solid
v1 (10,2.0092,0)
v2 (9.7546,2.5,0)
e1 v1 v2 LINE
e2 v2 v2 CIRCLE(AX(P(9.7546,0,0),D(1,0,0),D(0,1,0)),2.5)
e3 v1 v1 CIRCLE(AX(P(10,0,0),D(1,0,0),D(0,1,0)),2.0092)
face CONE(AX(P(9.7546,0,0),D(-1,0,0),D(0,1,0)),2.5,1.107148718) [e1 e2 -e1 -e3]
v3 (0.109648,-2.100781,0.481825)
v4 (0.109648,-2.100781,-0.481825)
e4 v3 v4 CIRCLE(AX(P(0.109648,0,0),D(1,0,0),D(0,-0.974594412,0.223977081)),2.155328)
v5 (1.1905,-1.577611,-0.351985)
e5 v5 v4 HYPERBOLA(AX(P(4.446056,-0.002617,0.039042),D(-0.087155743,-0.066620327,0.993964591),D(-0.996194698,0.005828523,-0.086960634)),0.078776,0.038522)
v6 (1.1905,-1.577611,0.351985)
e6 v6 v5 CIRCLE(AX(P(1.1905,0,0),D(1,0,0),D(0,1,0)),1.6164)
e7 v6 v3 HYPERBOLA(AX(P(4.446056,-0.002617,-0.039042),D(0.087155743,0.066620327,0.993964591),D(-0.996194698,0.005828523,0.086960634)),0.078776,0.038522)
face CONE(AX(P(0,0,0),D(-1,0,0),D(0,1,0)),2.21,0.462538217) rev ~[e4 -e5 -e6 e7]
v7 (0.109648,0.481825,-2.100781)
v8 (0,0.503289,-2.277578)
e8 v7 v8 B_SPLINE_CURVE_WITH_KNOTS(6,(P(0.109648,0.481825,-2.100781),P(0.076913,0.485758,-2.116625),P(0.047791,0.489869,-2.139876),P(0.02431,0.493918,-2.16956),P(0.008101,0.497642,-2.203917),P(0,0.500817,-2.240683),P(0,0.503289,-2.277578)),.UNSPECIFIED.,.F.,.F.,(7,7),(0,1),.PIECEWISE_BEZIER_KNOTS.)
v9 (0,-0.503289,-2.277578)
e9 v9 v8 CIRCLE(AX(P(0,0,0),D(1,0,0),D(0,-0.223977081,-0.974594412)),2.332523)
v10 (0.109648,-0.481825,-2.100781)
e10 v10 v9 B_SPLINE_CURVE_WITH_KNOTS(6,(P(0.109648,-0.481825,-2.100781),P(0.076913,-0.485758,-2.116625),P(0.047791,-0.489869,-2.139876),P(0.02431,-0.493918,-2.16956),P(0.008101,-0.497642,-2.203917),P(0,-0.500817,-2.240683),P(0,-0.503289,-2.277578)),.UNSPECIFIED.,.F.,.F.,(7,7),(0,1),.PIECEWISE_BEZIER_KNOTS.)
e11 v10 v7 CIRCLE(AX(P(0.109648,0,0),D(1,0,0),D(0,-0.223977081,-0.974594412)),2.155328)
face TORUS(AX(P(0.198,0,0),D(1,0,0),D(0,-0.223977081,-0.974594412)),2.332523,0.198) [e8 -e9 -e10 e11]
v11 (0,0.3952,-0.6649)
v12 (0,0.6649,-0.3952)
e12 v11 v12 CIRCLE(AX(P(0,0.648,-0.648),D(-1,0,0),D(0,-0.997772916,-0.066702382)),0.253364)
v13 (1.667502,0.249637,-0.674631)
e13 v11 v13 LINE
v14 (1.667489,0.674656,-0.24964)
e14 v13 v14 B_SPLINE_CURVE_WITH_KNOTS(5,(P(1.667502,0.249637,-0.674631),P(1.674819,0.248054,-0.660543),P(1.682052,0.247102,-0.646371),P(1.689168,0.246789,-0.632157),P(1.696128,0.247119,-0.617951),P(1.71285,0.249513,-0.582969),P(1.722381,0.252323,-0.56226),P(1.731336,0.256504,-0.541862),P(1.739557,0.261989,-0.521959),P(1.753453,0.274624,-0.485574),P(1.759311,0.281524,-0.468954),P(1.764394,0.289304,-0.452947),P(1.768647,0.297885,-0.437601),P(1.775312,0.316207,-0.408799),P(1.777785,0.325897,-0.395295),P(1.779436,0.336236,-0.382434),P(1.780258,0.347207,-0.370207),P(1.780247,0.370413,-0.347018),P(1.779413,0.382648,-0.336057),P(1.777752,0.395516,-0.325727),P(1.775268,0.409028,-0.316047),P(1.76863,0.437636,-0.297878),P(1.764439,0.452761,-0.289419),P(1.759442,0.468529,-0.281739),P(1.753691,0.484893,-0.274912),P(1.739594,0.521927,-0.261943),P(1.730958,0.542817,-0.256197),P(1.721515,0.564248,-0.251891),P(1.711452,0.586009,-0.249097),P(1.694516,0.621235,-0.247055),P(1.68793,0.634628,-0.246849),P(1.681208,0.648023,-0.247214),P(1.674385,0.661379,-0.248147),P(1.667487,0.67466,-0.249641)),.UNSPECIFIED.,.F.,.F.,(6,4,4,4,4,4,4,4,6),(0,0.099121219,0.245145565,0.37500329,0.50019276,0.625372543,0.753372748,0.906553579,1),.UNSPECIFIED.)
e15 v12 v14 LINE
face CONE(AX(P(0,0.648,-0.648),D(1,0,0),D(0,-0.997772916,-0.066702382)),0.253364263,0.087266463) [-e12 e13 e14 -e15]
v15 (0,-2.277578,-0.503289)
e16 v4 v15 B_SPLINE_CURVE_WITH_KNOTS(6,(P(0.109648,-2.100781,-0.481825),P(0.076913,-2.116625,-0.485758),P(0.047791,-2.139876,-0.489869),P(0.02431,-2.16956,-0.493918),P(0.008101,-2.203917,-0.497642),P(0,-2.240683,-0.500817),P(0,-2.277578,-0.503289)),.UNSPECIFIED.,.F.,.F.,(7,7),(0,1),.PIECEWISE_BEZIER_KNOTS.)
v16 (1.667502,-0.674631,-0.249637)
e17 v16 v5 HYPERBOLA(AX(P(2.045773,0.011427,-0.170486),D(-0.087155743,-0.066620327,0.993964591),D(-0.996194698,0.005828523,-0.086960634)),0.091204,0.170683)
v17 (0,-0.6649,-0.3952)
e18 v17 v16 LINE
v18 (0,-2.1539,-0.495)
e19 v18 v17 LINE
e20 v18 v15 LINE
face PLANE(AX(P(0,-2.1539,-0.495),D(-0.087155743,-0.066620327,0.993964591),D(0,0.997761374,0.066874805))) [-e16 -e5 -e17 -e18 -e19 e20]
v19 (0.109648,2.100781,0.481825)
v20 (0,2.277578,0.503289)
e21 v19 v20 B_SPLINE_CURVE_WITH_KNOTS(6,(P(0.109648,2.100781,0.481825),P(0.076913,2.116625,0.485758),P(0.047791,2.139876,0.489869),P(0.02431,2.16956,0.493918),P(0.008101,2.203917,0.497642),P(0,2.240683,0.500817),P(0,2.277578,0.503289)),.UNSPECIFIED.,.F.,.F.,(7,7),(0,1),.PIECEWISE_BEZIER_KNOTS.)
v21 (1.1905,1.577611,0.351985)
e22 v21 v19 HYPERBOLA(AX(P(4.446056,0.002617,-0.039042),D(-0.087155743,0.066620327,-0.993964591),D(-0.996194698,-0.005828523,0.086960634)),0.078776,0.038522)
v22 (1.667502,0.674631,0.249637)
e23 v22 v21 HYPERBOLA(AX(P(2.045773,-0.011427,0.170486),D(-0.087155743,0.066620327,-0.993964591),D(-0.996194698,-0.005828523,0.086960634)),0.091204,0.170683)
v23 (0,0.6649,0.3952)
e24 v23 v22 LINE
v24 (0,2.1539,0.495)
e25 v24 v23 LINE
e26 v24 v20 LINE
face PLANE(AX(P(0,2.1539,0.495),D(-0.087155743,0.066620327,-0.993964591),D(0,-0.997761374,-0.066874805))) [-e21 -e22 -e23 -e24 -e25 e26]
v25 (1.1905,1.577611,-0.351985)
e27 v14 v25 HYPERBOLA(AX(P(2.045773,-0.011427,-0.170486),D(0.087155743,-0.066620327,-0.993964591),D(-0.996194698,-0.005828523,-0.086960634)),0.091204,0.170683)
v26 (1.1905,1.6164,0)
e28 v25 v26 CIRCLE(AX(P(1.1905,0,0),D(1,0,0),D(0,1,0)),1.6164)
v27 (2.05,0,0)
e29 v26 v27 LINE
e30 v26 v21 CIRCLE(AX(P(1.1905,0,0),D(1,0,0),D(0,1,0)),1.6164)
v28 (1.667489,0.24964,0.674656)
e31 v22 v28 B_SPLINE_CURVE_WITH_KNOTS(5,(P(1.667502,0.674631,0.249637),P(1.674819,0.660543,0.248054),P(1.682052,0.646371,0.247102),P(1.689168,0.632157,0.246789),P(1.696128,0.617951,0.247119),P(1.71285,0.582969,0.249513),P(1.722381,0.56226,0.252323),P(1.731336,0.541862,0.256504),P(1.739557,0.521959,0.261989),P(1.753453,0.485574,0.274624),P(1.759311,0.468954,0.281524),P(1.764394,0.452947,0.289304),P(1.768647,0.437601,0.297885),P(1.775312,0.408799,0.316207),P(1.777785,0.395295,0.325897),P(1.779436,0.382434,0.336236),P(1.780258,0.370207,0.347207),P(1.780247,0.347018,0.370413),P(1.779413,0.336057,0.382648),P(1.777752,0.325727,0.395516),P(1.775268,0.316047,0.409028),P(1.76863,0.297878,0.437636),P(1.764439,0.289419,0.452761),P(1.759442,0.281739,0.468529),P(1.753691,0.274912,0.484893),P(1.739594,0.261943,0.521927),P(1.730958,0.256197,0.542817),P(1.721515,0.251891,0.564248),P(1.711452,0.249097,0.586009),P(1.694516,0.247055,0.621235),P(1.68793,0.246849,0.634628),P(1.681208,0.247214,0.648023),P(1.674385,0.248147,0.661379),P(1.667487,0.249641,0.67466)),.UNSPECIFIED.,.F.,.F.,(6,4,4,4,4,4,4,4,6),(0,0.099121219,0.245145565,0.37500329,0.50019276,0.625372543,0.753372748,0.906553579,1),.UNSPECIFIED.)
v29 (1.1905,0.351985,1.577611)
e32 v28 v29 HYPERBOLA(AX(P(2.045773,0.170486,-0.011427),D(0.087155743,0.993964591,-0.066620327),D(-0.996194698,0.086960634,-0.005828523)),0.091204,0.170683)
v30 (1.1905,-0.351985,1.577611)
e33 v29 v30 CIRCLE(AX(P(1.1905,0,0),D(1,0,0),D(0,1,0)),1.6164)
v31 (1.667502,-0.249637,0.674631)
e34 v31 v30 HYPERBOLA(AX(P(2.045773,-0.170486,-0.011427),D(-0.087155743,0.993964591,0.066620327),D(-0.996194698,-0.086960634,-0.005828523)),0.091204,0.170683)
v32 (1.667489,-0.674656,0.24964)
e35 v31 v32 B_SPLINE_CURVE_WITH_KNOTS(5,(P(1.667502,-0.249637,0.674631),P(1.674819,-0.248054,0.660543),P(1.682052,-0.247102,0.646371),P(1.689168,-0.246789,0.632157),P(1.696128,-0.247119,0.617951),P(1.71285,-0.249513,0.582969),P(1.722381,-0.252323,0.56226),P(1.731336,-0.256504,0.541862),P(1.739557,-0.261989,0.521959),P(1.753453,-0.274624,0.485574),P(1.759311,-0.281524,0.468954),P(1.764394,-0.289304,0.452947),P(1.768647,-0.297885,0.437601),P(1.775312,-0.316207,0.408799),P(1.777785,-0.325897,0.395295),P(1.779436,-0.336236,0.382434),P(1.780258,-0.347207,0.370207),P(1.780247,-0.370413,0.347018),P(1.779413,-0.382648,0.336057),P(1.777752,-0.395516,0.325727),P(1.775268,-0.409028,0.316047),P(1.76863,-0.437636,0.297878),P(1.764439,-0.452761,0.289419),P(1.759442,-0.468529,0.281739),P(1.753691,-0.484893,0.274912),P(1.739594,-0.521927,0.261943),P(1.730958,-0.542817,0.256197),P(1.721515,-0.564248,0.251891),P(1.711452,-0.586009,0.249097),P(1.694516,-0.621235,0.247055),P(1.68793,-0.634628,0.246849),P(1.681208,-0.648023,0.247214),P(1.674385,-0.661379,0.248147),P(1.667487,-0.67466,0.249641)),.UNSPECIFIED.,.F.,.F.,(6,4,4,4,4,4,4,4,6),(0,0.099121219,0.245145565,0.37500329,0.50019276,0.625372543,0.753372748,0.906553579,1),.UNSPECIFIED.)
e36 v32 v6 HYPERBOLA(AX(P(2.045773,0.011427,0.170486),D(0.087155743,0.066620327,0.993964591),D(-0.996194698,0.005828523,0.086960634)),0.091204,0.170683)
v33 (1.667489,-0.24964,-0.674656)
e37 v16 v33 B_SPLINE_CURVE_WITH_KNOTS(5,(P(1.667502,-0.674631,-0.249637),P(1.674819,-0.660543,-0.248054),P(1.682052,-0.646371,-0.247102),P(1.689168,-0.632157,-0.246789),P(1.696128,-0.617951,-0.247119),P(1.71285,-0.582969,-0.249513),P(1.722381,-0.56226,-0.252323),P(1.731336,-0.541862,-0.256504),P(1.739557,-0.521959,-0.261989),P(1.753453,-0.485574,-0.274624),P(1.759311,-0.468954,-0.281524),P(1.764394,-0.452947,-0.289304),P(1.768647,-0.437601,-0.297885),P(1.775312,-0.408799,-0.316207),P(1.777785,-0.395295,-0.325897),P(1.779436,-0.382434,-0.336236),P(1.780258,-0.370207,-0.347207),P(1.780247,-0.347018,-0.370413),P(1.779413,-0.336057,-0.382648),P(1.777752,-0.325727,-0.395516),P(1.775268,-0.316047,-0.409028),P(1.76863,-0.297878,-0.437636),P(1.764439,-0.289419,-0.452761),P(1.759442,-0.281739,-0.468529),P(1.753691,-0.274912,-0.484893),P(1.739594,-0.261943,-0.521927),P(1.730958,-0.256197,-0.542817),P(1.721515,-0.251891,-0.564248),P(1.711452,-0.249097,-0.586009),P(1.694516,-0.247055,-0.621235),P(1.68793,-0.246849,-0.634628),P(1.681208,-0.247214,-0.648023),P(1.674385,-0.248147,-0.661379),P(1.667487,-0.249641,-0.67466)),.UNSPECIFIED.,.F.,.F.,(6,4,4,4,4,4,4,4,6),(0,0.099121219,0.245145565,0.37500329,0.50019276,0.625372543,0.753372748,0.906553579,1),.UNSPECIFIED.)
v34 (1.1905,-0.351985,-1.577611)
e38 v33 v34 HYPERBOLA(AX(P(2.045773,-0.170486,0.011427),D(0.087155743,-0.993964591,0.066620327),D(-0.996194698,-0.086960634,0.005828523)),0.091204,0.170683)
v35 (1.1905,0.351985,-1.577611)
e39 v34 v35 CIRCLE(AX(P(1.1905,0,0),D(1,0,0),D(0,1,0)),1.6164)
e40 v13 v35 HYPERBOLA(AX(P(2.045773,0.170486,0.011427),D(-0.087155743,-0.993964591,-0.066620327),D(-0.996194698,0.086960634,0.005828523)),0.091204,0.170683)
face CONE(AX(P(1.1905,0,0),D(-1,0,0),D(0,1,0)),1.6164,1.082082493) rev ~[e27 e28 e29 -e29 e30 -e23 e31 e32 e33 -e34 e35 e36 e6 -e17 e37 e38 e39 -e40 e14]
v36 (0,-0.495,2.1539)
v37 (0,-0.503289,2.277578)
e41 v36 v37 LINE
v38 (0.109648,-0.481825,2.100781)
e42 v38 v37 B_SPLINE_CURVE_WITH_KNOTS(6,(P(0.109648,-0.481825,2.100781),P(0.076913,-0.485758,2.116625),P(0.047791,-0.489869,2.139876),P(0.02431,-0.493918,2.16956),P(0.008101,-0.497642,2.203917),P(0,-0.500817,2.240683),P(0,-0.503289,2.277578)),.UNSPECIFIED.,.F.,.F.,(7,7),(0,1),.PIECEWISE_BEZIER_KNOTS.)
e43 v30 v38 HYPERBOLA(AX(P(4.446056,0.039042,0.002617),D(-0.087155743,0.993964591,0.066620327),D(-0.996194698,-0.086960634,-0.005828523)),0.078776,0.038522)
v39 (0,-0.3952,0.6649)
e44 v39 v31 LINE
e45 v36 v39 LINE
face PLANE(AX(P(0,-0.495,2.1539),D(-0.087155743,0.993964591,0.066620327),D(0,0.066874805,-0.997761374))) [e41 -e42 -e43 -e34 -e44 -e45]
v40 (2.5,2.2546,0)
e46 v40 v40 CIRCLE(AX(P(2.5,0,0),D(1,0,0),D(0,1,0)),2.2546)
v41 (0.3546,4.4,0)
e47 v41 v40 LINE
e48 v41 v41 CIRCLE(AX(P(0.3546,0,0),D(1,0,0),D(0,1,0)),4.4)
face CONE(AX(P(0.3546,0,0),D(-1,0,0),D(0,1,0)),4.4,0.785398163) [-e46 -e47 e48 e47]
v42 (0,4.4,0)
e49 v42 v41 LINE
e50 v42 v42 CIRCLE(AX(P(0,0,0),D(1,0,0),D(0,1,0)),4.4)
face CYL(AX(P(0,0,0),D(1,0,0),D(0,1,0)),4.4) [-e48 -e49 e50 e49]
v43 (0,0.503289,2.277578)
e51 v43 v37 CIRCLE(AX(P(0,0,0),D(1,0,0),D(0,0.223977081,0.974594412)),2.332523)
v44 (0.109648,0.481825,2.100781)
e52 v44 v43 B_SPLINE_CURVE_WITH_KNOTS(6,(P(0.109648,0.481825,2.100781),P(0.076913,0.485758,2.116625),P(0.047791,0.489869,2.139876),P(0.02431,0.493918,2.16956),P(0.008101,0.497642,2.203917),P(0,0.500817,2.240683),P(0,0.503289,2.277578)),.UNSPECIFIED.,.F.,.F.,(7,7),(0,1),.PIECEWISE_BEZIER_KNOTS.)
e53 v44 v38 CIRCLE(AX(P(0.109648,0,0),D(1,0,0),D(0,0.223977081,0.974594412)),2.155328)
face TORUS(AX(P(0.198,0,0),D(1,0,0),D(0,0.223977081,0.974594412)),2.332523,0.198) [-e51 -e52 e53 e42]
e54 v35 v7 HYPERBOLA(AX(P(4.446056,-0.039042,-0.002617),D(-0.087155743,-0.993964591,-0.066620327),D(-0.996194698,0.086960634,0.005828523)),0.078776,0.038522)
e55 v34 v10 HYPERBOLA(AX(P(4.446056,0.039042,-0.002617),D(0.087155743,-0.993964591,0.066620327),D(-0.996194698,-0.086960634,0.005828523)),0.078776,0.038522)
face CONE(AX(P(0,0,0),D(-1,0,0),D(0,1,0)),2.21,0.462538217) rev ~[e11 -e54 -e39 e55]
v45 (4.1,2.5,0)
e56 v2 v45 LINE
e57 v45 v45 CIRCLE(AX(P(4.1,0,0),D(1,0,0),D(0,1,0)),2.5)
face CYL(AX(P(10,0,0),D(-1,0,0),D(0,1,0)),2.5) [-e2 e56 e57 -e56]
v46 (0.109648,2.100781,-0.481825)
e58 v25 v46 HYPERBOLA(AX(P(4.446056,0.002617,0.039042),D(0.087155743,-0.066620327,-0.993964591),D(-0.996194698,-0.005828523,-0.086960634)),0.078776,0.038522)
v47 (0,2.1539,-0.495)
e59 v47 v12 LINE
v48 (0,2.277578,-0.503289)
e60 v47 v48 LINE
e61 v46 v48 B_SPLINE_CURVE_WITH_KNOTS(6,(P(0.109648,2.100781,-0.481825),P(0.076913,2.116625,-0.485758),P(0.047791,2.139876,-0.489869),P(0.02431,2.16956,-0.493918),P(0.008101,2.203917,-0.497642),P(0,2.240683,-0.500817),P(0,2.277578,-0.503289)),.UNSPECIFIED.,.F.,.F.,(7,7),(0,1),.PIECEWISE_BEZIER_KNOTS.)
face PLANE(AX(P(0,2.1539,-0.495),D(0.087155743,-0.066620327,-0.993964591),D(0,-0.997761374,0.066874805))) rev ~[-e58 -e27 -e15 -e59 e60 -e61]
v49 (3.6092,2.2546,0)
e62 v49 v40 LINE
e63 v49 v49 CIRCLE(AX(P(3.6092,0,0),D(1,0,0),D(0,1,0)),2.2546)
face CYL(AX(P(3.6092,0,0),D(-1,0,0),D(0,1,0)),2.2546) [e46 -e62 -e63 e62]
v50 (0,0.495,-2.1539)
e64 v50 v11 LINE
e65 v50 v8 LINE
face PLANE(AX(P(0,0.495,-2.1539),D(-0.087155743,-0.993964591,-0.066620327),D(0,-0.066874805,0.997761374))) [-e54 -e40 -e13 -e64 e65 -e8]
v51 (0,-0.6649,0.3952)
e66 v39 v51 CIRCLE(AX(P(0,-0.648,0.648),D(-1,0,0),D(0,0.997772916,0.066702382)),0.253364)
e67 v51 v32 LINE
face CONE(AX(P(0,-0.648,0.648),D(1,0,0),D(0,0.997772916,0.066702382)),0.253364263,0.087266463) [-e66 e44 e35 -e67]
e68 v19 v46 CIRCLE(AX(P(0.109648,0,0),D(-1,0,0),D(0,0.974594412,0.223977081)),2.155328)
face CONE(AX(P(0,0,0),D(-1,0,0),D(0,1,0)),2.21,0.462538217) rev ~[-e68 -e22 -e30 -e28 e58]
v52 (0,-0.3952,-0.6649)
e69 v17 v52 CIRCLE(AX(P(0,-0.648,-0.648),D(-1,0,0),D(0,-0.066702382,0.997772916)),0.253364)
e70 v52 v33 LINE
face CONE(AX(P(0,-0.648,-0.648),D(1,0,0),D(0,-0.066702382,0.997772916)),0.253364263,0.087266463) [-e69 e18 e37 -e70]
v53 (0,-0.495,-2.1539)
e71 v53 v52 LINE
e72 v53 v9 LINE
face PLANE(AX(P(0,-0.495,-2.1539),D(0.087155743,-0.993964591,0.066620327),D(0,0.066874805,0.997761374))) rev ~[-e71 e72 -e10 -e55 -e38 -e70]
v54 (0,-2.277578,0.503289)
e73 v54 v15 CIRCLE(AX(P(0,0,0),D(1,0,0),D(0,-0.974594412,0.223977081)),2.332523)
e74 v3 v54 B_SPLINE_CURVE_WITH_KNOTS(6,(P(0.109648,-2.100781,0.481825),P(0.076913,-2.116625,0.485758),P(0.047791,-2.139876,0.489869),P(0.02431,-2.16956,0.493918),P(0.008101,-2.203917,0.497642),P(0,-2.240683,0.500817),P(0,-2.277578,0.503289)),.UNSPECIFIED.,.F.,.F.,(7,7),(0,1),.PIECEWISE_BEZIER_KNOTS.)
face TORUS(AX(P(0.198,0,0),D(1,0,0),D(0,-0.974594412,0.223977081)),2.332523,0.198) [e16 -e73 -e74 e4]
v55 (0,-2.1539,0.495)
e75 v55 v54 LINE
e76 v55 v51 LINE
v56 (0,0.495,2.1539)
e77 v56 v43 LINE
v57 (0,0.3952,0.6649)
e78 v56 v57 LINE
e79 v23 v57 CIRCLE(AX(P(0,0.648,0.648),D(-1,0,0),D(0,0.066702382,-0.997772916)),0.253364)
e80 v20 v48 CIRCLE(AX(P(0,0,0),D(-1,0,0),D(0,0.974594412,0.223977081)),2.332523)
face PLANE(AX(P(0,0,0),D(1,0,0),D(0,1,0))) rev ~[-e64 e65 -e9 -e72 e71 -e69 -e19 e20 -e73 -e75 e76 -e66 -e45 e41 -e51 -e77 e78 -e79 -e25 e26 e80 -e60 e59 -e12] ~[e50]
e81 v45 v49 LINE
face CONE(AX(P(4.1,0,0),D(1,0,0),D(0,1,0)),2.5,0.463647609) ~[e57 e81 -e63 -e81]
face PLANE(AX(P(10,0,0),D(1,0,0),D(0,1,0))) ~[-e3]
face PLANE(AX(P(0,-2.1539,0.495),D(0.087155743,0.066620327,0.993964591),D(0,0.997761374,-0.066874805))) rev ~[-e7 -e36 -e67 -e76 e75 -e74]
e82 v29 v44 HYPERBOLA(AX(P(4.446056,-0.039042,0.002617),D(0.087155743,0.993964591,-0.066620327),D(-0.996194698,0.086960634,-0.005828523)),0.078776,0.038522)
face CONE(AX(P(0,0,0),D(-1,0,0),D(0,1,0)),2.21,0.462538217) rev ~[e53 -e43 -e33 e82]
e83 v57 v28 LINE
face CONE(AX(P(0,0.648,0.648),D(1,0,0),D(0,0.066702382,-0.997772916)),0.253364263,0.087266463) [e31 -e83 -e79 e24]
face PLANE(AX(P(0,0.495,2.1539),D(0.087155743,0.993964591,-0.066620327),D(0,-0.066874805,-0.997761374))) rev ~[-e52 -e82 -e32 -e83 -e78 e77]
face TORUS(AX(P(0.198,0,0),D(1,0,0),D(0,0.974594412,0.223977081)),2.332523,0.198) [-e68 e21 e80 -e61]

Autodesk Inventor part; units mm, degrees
ref_plane "YZ Plane" through (0, 0, 0) normal (1, 0, 0) x (0, 1, 0)
ref_plane "XZ Plane" through (0, 0, 0) normal (0, 1, 0) x (-1, 0, 0)
sketch "Sketch1" plane through (0, 0, 0) normal (0, 0, 1) x (1, 0, 0)
  line L0 (2.05, 0) -> (10, 0)
  line L1 (10, 0) -> (10, 2.5)
  line L2 (10, 2.5) -> (4.1, 2.5)
  line L3 (4.1, 2.5) -> (3.6092, 2.2546)
  line L4 (3.6092, 2.2546) -> (2.5, 2.2546)
  line L5 (0, 4.4) -> (0, 2.21)
  line L6 (0, 2.21) -> (1.1905, 1.6164)
  line L7 (1.1905, 1.6164) -> (2.05, 0)
  line L8 (-2, 0) -> (12, 0) projected
  line L9 (0, -0.88) -> (0, 5.28) projected
  line L10 (0, 4.4) -> (0.3546, 4.4)
  line L11 (0.3546, 4.4) -> (2.5, 2.2546)
  line L12 (4.1, 2.5) -> (2.2546, 2.5) construction
  dimension "d1" = 5.9
  dimension "d2" = 5
  dimension "d3" = 4.5092
  dimension "d4" = 4.42
  dimension "d5" = 26.5
  dimension "d6" = 62
  dimension "d7" = 2.05
  dimension "d8" = 0.4908
  dimension "d12" = 8.8
  dimension "d13" = 45
  dimension "d15" = 10
  dimension "d24" = 2.5
revolve "Body" add sketch "Sketch1" angle 360 about axis through (2.05, 0, 0) along (1, 0, 0) contours L7 L6 L5 L10 L11 L4 L3 L2 L1 L0
sketch "Sketch2" plane through (0, 0, 0) normal (-1, 0, 0) x (0, 0, 1)
  line L0 (0, 2.21) -> (0, 0) construction
  line L1 (0, 0) -> (2.21, 0) construction
  arc A0 (0.663, 0) -> (0, 0.663) centre (0, 0) ccw construction
  arc A1 (0.7735, 0) -> (0, 0.7735) centre (0, 0) ccw construction
  arc A2 (2.1539, 0.495) -> (0.495, 2.1539) centre (0, 0) ccw
  line L2 (0, 0) -> (1.5627, 1.5627) construction
  line L3 (0.495, 2.1539) -> (0.3952, 0.6649)
  line L4 (2.1539, 0.495) -> (0.6649, 0.3952)
  arc A3 (0.495, 2.1539) -> (0, 2.21) centre (0, 0) ccw
  arc A4 (2.21, 0) -> (2.1539, 0.495) centre (0, 0) ccw
  line L5 (0, -6.16) -> (0, 6.16) projected
  line L6 (-6.16, 0) -> (6.16, 0) projected
  arc A5 (0.495, -2.1539) -> (2.1539, -0.495) centre (0, 0) ccw
  line L7 (0.495, -2.1539) -> (0.3952, -0.6649)
  line L8 (2.1539, -0.495) -> (0.6649, -0.3952)
  arc A6 (0, -2.21) -> (0.495, -2.1539) centre (0, 0) ccw
  arc A7 (2.1539, -0.495) -> (2.21, 0) centre (0, 0) ccw
  arc A8 (-0.495, 2.1539) -> (-2.1539, 0.495) centre (0, 0) ccw
  line L9 (-0.495, 2.1539) -> (-0.3952, 0.6649)
  line L10 (-2.1539, 0.495) -> (-0.6649, 0.3952)
  arc A9 (0, 2.21) -> (-0.495, 2.1539) centre (0, 0) ccw
  arc A10 (-2.1539, 0.495) -> (-2.21, 0) centre (0, 0) ccw
  arc A11 (-0.495, -2.1539) -> (0, -2.21) centre (0, 0) ccw
  arc A12 (-2.1539, -0.495) -> (-0.495, -2.1539) centre (0, 0) ccw
  arc A13 (-2.21, 0) -> (-2.1539, -0.495) centre (0, 0) ccw
  line L11 (-2.1539, -0.495) -> (-0.6649, -0.3952)
  line L12 (-0.495, -2.1539) -> (-0.3952, -0.6649)
  arc A14 (0.3952, 0.6649) -> (0.6649, 0.3952) centre (0.648, 0.648) ccw
  arc A15 (0.6649, -0.3952) -> (0.3952, -0.6649) centre (0.648, -0.648) ccw
  arc A16 (-0.6649, 0.3952) -> (-0.3952, 0.6649) centre (-0.648, 0.648) ccw
  arc A17 (-0.3952, -0.6649) -> (-0.6649, -0.3952) centre (-0.648, -0.648) ccw
  point P0 (1.5627, -1.5627)
  point P1 (-1.5627, 1.5627)
  point P2 (-1.5627, -1.5627)
  dimension "d17" = 1.326
  dimension "d18" = 1.547
  dimension "d19" = 4.42
  dimension "d20" = 45
  dimension "d21" = 0.495
extrude "Slot" add sketch "Sketch2" against normal up to next draft 5 contours L4 A14 L3 A2 | A5 L7 A15 L8 | L9 A16 L10 A8 | A12 L11 A17 L12
fillet "Fillet1" radius 0.198 4 edges at (0, 2.21, 0) (0, 0, -2.21) (0, -2.21, 0) (0, 0, 2.21)
thread "Thread" size "M5x0.8" class "6g" standard "ISO Metric profile" length 5.9
chamfer "Chamfer1" distance 0.4908 distance2 0.2454 1 edges at (10, -2.5, 0) measured on face at (10, 0.852, -0.5526)
ref_plane "Work Plane2" through (3.35, 0, 0) normal (0, 0, -1) x (1, 0, 0)
equation "\"d17\" = 0.3 * SDM"
equation "\"d18\" = 0.35 * SDM"
equation "\"d19\" = SDM"
equation "\"d21\" = 0.5 * SBR"
equation "\"d1\" = GEL"
equation "\"d2\" = GD"
equation "\"d3\" = BDM"
equation "\"d4\" = SDM"
equation "\"d7\" = INTI"
equation "\"d8\" = GAL"
equation "\"d12\" = KOD"
equation "\"d13\" = 0.5 * SEWI"
equation "\"d15\" = NLG"
equation "\"d24\" = KOH"
equation "\"d23\" = 0.2 * SBR"
equation "\"d10\" = GEL"
equation "\"d25\" = -0.5 * SPD + 0.5 * GD"
equation "\"d26\" = 0.5 * GAL"
equation "\"NLG\" = 10"
equation "\"GEL\" = 5.9"
equation "\"GAL\" = 0.61345 * PTC"
equation "\"SPD\" = NND - 1.2269 * PTC"
equation "\"KOD\" = 8.8"
equation "\"KOH\" = 2.5"
equation "\"SBR\" = 0.99"
equation "\"INTI\" = 2.05"
equation "\"SDM\" = 4.42"
equation "\"GD\" = NND"
equation "\"BDM\" = NND - GAL"
equation "\"SEWI\" = 90deg"
equation "\"d9\" = SDM"
equation "\"GUL\" = 0.61345 * PTC"
equation "\"TOA\" = 30deg"
equation "\"EPV\" = 5"
equation "\"THREADDIA\" = 5"
equation "\"RR\" = 0.5"
equation "\"PTC\" = 0.8"
equation "\"NND\" = 5"
equation "\"GD1\" = THREADDIA - 1.2269 * PTC"
properties part number "AS 1427 - M5 x 10" material "Steel, Mild"
